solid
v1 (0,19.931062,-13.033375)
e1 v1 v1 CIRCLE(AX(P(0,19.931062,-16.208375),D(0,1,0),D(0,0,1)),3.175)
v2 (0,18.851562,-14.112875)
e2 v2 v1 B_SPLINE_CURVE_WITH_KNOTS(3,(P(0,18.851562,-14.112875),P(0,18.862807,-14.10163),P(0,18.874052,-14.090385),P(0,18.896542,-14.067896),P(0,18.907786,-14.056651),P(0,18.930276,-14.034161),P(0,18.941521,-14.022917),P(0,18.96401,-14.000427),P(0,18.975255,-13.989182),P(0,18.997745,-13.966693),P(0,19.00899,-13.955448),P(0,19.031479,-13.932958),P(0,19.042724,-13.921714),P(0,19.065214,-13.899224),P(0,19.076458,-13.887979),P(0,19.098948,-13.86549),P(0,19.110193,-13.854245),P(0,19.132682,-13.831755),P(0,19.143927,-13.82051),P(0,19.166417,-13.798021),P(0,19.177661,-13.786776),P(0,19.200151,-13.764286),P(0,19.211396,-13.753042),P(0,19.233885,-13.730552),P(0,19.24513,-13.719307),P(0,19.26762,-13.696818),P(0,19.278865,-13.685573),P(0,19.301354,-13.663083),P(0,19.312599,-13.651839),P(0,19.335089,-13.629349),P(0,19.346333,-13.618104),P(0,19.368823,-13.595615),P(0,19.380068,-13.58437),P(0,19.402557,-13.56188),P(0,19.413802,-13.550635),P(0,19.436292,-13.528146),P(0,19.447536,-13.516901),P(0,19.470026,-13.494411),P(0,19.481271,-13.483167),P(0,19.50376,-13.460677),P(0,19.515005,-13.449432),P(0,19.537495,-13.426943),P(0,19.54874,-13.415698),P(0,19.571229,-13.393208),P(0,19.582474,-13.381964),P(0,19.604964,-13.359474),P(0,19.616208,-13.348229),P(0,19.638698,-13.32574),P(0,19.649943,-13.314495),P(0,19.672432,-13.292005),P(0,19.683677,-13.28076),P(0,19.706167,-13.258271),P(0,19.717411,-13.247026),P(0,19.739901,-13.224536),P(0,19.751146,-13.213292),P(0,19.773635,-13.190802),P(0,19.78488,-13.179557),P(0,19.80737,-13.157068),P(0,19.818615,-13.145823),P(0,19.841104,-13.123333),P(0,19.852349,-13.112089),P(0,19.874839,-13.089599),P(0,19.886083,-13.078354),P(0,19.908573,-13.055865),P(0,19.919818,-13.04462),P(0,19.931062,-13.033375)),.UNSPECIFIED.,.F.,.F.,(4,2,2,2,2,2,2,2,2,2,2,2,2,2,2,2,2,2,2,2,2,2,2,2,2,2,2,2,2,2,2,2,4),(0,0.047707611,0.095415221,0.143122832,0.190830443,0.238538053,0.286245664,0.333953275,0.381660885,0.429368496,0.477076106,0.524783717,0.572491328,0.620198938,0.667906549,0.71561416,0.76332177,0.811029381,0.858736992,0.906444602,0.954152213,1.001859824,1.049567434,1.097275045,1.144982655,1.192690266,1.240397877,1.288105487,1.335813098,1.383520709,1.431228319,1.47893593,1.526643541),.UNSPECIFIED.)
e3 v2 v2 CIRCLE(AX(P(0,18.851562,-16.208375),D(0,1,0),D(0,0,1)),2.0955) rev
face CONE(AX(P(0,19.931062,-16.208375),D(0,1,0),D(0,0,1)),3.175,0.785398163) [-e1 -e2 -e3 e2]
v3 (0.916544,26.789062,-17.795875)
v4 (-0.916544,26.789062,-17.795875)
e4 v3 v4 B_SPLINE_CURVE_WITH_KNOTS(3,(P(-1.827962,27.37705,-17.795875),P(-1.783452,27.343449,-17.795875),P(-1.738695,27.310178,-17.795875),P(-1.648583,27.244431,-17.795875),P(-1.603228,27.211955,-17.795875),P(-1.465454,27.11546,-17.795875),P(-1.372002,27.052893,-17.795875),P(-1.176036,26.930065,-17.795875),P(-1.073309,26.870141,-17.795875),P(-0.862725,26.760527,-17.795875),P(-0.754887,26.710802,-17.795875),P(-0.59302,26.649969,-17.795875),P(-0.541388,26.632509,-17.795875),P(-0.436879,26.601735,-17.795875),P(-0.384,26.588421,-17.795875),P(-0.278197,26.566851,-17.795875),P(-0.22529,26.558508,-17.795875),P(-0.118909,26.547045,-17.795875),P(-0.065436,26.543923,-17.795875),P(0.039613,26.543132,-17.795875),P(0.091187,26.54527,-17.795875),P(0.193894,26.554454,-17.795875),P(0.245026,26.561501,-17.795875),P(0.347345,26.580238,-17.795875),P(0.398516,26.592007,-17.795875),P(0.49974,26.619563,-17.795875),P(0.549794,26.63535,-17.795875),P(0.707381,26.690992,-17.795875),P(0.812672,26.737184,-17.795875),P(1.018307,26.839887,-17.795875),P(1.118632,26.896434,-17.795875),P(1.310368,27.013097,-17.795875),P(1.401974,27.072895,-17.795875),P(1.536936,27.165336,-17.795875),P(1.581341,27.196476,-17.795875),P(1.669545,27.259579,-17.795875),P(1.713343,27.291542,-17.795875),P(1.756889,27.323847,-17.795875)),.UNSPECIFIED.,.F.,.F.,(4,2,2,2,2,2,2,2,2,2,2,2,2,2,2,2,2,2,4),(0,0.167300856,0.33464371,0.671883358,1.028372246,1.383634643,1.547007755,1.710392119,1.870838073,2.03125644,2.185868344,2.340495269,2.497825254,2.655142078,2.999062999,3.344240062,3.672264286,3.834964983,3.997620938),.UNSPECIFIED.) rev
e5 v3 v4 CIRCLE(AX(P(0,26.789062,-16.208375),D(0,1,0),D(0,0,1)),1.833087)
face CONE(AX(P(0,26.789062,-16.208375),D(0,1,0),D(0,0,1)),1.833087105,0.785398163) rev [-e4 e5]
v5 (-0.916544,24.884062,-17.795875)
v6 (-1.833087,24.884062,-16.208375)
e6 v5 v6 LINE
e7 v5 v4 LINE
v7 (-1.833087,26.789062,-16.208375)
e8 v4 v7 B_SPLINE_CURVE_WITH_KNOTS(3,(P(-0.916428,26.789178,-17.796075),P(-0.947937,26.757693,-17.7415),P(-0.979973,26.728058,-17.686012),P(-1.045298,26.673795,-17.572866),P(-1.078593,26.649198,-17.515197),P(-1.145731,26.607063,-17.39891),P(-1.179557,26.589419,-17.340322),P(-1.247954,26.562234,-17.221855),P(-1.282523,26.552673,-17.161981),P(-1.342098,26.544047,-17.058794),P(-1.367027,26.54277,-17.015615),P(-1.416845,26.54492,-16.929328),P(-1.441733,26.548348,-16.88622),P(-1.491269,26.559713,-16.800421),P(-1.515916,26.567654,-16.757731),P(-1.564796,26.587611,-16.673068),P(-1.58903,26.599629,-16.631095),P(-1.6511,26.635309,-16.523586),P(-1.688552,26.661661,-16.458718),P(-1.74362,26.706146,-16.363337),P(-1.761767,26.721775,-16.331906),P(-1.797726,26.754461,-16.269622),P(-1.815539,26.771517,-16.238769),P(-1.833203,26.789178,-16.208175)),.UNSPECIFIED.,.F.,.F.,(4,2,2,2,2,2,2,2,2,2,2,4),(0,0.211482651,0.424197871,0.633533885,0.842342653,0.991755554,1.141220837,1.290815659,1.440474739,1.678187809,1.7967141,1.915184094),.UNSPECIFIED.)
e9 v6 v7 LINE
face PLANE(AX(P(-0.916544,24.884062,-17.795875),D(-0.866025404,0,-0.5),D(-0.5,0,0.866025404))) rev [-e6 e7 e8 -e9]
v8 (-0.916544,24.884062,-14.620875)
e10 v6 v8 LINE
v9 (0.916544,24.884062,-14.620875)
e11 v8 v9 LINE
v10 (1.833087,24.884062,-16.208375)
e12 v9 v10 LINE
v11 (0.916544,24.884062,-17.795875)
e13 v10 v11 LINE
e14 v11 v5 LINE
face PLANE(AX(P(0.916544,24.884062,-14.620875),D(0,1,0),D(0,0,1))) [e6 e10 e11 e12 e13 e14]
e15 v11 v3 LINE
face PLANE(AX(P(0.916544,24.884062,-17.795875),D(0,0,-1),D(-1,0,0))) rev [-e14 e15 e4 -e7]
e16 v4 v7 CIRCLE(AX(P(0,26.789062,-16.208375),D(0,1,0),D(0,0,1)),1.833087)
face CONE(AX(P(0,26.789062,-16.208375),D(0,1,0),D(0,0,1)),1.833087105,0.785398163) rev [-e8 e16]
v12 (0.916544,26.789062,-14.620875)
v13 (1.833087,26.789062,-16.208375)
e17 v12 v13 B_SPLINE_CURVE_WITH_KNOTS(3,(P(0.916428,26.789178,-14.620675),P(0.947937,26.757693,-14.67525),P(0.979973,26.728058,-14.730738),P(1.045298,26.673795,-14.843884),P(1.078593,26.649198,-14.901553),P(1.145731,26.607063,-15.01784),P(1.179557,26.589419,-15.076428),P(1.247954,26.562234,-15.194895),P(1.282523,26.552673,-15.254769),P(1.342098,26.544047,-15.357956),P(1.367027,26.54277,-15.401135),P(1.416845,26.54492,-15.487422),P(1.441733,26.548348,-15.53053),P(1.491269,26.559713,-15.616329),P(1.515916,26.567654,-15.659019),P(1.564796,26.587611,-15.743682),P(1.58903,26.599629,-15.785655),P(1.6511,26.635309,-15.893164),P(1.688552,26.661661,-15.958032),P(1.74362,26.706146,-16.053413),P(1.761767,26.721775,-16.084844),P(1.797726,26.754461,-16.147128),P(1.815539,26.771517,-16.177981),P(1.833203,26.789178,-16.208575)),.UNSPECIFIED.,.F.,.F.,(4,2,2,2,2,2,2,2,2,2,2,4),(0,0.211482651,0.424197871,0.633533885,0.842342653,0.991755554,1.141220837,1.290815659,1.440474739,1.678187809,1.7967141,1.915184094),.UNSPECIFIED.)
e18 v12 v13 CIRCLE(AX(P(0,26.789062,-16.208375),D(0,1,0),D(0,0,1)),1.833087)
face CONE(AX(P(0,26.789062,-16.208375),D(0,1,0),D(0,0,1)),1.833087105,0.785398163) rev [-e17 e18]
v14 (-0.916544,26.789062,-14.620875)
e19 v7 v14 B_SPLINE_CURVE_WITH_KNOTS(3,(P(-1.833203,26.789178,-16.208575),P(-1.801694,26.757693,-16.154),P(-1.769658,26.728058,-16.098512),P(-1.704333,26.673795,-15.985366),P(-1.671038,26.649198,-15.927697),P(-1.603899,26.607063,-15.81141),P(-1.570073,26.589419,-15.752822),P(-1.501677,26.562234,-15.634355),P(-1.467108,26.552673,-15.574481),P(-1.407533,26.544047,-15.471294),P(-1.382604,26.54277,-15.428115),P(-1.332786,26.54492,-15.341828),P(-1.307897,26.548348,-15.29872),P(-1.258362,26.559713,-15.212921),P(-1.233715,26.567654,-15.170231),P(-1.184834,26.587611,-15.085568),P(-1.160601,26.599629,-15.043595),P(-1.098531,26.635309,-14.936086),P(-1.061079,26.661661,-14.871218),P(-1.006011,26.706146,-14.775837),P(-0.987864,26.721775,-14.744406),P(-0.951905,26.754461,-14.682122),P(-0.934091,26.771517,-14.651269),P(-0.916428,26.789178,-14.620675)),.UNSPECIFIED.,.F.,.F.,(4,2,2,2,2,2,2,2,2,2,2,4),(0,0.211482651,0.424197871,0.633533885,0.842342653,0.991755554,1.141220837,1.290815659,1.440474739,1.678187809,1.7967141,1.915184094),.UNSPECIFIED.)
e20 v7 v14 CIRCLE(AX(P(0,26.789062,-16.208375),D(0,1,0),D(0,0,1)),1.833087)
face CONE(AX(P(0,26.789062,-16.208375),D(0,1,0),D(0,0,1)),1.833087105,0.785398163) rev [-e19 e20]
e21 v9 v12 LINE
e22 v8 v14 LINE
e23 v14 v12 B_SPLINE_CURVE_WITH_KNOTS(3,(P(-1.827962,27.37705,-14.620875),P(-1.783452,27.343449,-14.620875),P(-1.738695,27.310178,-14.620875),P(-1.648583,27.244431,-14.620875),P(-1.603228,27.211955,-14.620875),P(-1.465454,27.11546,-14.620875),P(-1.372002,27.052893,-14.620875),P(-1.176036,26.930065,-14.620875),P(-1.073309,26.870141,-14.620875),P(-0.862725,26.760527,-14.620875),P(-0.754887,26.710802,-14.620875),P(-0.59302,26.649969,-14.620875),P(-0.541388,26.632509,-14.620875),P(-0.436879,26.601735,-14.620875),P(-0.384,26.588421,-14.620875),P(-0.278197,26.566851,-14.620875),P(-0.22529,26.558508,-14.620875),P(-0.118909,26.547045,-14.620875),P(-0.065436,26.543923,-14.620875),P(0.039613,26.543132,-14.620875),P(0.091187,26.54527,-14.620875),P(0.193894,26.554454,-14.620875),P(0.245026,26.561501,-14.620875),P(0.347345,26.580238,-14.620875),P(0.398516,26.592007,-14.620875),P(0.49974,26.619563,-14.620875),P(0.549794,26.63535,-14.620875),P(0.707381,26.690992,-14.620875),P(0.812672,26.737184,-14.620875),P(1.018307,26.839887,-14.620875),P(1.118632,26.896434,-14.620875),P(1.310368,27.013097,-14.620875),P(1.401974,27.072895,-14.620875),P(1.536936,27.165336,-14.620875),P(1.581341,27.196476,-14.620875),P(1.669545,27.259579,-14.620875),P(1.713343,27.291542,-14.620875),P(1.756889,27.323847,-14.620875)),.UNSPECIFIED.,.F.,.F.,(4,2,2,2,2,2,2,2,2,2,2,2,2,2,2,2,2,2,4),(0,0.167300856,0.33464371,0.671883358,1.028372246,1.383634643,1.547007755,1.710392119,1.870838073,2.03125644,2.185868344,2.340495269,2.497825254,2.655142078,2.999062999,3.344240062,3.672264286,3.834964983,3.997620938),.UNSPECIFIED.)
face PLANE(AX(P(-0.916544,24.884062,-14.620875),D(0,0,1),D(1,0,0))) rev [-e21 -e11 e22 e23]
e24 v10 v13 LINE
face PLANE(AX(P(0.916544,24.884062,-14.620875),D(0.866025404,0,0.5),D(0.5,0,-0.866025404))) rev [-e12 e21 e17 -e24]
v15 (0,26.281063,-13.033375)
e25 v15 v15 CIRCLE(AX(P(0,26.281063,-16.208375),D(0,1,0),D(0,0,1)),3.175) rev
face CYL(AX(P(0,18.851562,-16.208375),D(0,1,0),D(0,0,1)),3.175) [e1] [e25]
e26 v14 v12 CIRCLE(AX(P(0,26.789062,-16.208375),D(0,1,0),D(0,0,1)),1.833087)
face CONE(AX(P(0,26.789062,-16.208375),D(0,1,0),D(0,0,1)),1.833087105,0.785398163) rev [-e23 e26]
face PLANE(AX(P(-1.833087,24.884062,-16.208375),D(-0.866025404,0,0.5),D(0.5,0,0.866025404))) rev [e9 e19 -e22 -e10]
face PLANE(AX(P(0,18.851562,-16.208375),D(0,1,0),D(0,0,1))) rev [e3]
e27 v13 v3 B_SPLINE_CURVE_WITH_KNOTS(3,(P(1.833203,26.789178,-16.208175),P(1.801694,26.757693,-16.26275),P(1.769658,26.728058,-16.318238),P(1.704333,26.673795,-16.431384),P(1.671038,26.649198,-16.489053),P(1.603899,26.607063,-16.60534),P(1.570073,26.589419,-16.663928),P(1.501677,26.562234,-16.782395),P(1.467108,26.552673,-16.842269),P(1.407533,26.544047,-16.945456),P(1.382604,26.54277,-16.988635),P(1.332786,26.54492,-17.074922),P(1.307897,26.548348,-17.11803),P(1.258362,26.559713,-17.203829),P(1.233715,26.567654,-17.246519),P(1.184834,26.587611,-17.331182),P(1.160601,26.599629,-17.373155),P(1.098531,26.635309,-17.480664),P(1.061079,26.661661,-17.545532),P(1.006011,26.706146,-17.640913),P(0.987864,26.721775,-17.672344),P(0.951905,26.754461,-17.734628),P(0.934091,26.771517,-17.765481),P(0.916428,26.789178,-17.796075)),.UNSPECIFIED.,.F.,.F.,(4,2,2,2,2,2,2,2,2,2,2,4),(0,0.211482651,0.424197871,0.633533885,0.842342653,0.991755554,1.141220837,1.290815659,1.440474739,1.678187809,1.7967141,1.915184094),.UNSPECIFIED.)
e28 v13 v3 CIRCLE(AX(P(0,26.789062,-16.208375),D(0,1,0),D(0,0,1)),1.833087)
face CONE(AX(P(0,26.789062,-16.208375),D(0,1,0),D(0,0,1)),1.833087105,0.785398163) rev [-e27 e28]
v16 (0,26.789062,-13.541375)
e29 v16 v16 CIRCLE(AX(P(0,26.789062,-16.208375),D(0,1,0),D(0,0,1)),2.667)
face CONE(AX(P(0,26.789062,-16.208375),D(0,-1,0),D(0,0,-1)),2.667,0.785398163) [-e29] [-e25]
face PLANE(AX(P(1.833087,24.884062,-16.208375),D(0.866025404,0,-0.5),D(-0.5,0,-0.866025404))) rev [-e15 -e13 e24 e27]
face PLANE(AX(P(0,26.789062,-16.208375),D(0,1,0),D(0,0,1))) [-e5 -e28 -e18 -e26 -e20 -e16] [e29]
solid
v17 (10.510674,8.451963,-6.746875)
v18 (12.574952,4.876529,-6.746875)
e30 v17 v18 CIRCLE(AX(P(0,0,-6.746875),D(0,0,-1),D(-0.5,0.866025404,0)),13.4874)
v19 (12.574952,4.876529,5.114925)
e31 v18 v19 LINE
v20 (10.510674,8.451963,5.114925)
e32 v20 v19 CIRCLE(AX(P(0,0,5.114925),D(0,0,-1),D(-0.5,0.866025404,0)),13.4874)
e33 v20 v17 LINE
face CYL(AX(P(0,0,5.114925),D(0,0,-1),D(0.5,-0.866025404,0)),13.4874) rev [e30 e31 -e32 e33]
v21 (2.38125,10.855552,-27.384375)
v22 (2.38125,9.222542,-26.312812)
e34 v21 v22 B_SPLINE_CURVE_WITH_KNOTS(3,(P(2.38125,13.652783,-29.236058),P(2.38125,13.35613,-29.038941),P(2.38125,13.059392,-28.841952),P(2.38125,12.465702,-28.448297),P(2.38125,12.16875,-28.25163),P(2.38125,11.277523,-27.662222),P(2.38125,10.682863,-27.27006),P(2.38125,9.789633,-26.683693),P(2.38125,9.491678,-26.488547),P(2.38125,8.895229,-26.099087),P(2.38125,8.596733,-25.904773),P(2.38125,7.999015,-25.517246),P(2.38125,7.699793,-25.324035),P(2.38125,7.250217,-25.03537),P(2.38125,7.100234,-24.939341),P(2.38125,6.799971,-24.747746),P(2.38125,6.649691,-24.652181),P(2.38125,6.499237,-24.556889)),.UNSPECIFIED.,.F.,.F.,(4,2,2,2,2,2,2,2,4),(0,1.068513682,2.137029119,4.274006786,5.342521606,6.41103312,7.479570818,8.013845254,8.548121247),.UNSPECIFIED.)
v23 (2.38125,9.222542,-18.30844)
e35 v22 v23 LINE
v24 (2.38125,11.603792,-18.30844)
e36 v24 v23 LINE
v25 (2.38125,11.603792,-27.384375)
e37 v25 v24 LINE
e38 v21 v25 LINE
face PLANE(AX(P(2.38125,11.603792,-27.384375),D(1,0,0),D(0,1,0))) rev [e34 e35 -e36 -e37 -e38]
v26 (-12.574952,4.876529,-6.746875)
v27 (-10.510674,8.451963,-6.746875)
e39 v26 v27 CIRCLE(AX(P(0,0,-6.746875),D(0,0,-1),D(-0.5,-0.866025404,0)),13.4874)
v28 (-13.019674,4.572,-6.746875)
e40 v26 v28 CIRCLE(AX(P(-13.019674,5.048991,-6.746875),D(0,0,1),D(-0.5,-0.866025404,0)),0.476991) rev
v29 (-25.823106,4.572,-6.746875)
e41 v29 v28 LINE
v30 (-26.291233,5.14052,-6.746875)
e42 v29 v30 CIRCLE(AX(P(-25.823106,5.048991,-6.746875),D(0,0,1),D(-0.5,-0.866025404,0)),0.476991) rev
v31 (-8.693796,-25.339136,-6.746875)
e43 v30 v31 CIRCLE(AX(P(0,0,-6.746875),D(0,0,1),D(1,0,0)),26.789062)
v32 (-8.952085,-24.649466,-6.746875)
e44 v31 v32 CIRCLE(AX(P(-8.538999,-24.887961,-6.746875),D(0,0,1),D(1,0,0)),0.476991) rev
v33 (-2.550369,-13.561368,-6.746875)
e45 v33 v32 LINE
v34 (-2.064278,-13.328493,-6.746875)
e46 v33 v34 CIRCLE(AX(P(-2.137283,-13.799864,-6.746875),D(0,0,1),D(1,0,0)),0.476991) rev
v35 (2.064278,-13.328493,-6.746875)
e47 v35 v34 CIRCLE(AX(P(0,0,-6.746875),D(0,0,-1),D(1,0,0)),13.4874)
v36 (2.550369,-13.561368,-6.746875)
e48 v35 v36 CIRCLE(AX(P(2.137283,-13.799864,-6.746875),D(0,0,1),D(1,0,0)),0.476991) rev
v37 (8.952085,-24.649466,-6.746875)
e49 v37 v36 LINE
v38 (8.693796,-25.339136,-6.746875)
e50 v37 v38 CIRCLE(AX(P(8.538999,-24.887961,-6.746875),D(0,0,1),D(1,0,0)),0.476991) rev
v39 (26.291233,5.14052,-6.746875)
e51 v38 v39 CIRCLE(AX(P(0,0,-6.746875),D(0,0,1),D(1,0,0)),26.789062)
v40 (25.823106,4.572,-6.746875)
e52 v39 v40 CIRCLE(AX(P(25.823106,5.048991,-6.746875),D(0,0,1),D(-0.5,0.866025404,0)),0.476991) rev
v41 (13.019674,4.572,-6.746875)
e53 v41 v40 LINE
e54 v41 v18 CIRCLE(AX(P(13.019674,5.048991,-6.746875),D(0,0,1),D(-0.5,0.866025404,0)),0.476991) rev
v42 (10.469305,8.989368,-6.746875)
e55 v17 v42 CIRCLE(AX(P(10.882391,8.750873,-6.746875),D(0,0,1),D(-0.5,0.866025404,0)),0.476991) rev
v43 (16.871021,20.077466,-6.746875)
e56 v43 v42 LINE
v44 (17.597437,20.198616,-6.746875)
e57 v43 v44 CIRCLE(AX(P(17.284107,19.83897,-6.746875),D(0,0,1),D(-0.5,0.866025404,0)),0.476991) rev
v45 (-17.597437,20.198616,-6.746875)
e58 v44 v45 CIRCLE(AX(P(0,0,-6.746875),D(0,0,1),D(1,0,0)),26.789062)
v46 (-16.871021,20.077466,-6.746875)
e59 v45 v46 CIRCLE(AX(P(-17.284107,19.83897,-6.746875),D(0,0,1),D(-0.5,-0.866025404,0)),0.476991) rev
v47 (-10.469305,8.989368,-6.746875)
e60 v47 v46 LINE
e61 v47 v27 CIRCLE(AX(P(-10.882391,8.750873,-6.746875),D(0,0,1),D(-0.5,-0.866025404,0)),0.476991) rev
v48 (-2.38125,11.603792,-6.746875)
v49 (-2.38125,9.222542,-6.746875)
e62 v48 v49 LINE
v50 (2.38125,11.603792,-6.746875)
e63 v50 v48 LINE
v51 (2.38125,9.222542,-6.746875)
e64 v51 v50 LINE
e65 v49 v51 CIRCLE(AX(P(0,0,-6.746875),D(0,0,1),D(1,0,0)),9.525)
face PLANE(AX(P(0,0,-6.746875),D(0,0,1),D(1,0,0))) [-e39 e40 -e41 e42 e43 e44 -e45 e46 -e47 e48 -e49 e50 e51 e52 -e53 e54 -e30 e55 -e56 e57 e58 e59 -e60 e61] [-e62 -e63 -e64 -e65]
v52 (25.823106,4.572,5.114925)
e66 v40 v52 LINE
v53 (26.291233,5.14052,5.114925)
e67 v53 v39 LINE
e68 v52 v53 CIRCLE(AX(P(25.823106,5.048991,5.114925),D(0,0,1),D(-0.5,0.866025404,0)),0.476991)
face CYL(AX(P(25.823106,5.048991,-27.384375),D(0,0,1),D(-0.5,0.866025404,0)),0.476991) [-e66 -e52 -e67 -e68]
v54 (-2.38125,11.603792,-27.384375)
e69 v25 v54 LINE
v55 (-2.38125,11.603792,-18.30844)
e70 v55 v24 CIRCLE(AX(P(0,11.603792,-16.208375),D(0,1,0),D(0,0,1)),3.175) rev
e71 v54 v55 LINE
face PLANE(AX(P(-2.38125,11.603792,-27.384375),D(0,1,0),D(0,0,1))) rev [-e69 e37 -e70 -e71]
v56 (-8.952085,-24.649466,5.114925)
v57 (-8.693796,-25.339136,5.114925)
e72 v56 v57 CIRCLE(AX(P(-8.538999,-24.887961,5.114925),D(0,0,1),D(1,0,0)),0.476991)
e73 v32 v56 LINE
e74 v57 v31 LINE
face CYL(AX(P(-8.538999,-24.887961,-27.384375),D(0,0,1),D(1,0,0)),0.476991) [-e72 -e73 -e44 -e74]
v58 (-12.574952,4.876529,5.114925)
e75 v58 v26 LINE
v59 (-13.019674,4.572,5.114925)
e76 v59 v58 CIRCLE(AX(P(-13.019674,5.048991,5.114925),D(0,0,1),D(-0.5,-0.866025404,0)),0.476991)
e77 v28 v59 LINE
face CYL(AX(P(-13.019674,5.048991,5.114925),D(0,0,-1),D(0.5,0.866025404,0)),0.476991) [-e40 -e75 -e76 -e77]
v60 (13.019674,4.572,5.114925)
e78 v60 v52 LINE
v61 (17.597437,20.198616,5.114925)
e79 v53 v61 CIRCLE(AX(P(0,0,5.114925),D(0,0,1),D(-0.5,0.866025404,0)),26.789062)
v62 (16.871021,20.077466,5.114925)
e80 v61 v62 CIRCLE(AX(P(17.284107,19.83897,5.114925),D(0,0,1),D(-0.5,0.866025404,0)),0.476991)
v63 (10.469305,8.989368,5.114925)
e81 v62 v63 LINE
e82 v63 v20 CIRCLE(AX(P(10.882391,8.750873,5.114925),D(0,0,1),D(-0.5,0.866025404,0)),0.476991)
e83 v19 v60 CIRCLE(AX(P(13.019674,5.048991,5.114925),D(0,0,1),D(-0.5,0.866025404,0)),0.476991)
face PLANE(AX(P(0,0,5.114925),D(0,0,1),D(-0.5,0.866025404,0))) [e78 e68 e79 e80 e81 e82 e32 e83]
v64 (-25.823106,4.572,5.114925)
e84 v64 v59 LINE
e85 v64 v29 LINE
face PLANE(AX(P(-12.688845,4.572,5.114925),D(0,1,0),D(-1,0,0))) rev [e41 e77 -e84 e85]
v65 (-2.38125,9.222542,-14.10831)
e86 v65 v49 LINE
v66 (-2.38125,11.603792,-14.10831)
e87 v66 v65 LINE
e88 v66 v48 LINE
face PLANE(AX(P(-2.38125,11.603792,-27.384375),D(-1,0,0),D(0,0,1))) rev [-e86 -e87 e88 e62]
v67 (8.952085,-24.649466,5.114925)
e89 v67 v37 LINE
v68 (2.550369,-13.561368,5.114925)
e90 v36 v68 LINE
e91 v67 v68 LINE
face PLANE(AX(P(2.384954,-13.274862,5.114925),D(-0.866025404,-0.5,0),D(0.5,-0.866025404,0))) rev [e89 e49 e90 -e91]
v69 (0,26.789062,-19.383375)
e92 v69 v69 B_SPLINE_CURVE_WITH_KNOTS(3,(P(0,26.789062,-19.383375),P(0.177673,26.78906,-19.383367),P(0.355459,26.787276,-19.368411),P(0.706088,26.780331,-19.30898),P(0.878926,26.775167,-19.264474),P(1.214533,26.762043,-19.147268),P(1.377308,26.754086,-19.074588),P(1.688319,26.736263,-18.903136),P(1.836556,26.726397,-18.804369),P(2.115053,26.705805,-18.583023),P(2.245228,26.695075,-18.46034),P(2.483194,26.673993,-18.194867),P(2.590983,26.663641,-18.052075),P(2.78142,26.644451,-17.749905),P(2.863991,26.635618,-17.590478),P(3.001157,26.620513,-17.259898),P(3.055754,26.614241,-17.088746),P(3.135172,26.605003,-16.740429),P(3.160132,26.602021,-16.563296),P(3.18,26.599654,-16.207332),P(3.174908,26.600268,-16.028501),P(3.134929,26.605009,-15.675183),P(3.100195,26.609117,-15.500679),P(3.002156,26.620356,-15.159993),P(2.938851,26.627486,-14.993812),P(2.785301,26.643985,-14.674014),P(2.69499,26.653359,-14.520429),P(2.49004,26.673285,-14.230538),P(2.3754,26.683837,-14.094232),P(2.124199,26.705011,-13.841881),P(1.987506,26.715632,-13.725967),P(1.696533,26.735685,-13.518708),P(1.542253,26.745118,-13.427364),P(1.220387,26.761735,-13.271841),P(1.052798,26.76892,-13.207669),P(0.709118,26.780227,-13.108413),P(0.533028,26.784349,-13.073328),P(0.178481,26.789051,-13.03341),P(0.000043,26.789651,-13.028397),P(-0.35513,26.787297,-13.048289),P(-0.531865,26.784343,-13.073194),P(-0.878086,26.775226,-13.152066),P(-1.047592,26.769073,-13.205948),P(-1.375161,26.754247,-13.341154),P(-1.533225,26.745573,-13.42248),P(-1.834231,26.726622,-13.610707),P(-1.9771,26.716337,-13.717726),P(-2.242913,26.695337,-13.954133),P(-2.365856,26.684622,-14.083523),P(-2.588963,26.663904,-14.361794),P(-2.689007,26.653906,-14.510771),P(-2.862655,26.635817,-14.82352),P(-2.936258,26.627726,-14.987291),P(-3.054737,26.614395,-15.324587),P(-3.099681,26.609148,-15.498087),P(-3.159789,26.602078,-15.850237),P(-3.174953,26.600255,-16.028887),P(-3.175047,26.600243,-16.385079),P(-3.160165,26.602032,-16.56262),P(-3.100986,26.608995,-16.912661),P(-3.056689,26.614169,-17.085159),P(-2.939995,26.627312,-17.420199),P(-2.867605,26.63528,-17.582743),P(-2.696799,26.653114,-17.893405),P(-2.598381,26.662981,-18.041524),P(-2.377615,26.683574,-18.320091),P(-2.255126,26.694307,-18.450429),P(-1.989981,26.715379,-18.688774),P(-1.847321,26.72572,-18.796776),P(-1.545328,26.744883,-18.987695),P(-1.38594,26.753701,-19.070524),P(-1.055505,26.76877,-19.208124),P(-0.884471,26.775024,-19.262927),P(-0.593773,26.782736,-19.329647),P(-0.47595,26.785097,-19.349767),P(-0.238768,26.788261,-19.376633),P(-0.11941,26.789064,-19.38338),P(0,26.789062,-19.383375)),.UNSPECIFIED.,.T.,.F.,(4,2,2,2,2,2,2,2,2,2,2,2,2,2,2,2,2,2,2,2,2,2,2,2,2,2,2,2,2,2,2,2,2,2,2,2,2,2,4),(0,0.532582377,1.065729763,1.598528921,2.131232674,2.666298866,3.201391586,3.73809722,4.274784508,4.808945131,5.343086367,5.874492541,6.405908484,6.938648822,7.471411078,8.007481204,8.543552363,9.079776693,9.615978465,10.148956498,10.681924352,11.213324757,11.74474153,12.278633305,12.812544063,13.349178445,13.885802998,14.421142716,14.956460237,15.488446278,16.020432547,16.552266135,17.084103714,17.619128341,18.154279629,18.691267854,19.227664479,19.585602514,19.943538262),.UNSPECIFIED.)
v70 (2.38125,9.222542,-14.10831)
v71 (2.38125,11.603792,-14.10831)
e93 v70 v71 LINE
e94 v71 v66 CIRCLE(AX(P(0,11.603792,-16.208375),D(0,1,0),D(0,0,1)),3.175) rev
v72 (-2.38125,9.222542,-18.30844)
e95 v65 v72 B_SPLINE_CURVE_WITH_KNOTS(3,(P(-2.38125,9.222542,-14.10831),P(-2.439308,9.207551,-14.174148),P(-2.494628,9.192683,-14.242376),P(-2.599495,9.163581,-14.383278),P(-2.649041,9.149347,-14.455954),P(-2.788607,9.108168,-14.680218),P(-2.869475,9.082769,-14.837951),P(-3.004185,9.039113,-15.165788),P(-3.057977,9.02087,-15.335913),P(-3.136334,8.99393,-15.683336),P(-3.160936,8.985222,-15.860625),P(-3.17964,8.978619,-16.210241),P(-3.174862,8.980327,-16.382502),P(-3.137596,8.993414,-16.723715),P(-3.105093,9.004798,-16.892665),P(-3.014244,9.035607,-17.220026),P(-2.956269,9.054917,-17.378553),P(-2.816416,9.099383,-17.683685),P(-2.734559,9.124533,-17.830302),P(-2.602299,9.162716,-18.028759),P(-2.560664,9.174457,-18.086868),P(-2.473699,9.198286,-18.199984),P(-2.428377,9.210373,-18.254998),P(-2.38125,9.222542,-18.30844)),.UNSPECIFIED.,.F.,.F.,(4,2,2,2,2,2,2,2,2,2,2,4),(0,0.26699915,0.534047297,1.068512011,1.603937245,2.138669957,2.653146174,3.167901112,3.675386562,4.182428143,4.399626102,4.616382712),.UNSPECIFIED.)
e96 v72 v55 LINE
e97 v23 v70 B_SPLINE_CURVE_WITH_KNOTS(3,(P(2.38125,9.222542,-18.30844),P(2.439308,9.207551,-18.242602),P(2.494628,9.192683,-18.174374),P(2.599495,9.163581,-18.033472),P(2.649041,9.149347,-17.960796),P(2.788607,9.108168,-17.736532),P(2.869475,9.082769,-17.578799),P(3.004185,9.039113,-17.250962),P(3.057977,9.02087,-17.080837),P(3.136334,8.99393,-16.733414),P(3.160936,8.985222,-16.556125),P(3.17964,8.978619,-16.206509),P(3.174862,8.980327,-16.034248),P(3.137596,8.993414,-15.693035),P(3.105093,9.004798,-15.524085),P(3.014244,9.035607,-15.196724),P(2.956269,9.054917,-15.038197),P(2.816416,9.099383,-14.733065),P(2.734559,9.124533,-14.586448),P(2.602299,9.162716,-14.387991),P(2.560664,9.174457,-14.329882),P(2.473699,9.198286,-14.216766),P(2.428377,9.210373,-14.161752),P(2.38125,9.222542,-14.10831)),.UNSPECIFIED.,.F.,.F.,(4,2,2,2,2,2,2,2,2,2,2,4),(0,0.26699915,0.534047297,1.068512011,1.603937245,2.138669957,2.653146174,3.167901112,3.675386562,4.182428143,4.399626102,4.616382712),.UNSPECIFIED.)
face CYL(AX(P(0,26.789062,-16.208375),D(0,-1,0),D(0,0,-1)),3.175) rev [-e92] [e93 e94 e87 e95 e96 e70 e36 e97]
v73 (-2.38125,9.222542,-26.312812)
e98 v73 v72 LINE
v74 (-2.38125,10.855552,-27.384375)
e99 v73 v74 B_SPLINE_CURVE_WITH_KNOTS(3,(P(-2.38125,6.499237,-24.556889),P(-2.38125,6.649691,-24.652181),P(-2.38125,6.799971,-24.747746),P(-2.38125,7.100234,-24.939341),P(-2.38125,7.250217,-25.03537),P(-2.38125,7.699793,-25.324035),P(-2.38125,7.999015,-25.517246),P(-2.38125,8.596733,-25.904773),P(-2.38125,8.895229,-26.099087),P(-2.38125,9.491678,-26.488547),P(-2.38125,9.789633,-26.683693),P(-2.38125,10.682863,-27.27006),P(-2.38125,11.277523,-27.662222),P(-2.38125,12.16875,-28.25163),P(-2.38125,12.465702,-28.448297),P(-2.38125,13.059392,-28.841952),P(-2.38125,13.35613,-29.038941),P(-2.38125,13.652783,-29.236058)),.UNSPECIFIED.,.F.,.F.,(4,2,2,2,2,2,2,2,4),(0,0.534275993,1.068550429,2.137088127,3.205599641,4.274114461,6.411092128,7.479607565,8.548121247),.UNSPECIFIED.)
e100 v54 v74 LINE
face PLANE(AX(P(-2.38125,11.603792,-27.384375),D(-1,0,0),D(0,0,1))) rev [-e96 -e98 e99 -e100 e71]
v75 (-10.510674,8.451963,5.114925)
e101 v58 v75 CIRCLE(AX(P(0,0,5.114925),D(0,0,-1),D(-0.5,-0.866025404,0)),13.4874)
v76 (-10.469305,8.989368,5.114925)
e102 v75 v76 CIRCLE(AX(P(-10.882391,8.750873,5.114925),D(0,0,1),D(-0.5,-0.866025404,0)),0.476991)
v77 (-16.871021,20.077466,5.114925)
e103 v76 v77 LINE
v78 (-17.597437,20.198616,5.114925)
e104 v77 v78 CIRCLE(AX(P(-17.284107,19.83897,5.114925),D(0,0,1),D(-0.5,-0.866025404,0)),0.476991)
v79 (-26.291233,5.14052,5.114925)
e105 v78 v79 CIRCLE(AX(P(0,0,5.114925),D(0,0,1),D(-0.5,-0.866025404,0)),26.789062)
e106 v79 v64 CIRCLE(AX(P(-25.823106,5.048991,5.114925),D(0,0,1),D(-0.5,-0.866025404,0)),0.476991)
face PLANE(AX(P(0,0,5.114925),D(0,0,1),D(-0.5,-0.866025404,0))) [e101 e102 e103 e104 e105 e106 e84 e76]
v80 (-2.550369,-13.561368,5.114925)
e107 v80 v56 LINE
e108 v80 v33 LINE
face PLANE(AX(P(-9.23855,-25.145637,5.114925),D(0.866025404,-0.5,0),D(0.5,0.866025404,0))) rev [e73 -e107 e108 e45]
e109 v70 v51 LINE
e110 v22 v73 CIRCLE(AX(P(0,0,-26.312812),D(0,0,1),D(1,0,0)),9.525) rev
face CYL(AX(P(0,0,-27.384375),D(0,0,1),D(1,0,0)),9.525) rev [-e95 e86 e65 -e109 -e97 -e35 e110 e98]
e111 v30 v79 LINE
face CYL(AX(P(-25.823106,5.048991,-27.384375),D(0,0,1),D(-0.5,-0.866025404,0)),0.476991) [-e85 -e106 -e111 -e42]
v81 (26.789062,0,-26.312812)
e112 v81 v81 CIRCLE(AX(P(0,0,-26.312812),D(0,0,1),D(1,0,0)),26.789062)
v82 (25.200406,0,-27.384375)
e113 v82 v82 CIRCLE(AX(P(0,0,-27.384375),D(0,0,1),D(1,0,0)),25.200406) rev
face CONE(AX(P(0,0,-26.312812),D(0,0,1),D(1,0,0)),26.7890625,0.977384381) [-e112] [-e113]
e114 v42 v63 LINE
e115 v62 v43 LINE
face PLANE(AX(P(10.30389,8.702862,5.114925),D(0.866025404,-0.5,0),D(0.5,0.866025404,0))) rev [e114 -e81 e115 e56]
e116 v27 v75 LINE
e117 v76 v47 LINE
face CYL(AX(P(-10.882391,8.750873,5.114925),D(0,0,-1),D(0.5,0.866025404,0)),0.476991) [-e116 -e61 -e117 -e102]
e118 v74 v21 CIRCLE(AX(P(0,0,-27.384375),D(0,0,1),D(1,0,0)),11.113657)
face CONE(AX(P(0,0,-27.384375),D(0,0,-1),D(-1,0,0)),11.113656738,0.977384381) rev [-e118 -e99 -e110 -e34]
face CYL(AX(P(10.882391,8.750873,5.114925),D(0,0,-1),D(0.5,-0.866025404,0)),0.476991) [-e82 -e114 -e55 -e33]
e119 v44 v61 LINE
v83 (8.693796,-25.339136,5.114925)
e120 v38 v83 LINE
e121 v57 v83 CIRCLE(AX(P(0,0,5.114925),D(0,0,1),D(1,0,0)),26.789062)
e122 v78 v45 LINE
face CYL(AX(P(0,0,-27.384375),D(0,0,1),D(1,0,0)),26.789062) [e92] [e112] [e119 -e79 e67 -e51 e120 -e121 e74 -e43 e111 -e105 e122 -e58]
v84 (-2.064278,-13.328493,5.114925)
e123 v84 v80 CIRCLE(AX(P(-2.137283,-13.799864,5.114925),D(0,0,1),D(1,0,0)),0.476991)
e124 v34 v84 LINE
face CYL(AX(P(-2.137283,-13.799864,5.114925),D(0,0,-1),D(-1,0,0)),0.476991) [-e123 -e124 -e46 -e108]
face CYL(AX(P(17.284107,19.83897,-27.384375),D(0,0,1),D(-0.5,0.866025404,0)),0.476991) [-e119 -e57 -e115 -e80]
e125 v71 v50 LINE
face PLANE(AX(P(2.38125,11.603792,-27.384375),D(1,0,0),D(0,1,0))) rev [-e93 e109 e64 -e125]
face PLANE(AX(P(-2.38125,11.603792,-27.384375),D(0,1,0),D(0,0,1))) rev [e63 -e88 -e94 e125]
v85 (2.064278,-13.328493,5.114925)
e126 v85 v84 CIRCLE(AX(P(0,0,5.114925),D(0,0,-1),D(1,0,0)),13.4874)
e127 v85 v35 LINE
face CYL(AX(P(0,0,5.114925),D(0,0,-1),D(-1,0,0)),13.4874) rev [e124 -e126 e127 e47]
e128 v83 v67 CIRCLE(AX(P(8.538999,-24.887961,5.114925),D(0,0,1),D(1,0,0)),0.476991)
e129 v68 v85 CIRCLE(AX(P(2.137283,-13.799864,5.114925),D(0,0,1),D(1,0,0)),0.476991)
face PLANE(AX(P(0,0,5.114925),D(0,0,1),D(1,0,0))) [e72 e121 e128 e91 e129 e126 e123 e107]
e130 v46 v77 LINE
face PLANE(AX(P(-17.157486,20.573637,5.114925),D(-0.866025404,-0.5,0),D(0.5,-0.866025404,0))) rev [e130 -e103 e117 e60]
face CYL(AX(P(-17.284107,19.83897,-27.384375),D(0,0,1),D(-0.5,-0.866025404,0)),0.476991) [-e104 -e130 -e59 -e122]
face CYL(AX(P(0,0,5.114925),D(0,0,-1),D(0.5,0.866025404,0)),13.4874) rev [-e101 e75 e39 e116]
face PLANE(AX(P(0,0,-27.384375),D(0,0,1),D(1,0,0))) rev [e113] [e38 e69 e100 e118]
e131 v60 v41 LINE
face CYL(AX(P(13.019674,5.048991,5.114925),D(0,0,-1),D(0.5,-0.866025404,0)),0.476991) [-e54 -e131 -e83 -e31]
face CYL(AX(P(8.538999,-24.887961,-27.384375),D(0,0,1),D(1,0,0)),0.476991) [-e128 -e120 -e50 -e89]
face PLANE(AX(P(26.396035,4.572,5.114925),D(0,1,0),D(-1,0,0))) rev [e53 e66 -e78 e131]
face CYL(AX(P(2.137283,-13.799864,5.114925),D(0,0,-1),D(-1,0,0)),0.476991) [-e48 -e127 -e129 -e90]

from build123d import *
from OCP.BRepFilletAPI import BRepFilletAPI_MakeChamfer

# Parameters (mm, degrees)
BOSS_EXTRUDE1_START      = -6.746875
SKETCH1_R                = 26.7890625
BOSS_EXTRUDE1_DEPTH      = 20.6375
BOSS_EXTRUDE2_DEPTH      = 11.8618
FILLET1_R                = 0.476990821
CIRPATTERN1_COUNT        = 3
FILLET1_OF_CIRPATTERN1_R = 0.476990821
CUT_EXTRUDE5_DEPTH       = 47.746248335
CUT_EXTRUDE5_DEPTH_BACK  = 47.746248335
SKETCH15_R               = 9.525
CHAMFER1_SIZE            = 1.0715625
CHAMFER1_SIZE2           = 1.588656738
CUT_EXTRUDE1_DEPTH       = 47.746248335
CUT_EXTRUDE1_DEPTH_BACK  = 47.746248335
SKETCH5_R                = 3.175
CUT_EXTRUDE2_DEPTH       = 47.746248335
SKETCH6_R                = 3.175
BOSS_EXTRUDE3_DEPTH      = 7.9375
CUT_EXTRUDE3_DEPTH       = 1.905
CHAMFER3_SIZE            = 0.508
CHAMFER4_SIZE            = 1.0795


with BuildPart() as part:
    # Sketch1 → Boss-Extrude1 (new body)
    with BuildSketch(Plane.XY.offset(BOSS_EXTRUDE1_START)):
        Circle(SKETCH1_R)
    extrude(amount=-BOSS_EXTRUDE1_DEPTH)

    # Sketch2 → Boss-Extrude2 (add)
    with BuildSketch(Plane.XY.offset(-6.746875)):
        with BuildLine():
            Line((-9.238549561, -25.145637229), (-2.384954104, -13.274861682))
            ThreePointArc((-2.384954104, -13.274861682), (0, -13.4874), (2.384954104, -13.274861682))
            Line((2.384954104, -13.274861682), (9.238549561, -25.145637229))
            ThreePointArc((9.238549561, -25.145637229), (0, -26.7890625), (-9.238549561, -25.145637229))
        make_face()
    boss_extrude2 = extrude(amount=BOSS_EXTRUDE2_DEPTH)

    # Fillet1
    # the kernel refuses this fillet: 0.476990821 mm, written as the material it takes off along each edge
    with BuildSketch(Plane(origin=(-9.238549561, -25.145637229, -6.746875), x_dir=(0.9423194959651416, -0.33471475546202245, 0), z_dir=(0, 0, 1))) as fillet1_piece_1:
        with BuildLine():
            CenterArc((0.572952448, 0.476963054), FILLET1_R, 169.55519331, 101.063030663)
            Line((0.103865366, 0.563435893), (0, 0))
            ThreePointArc((0, 0), (0.28904955, -0.001559444), (0.5780991, 0))
        make_face()
    extrude(amount=13.307047751, mode=Mode.SUBTRACT)
    with BuildSketch(Plane(origin=(9.238549561, -25.145637229, -6.746875), x_dir=(-0.9423194959651411, -0.3347147554620237, 0), z_dir=(0, 0, 1))) as fillet1_piece_2:
        with BuildLine():
            CenterArc((0.572952448, -0.476963054), FILLET1_R, 89.381776027, 101.063030663)
            Line((0.103865366, -0.563435893), (0, 0))
            ThreePointArc((0, 0), (0.28904955, 0.001559444), (0.5780991, 0))
        make_face()
    extrude(amount=13.307047751, mode=Mode.SUBTRACT)
    with BuildSketch(Plane(origin=(2.384954104, -13.274861682, -6.746875), x_dir=(0.49999999999999706, -0.8660254037844404, 0), z_dir=(0, 0, 1))) as fillet1_piece_3:
        with BuildLine():
            CenterArc((0.330829178, -0.476990821), FILLET1_R, 90, 68.803855098)
            ThreePointArc((-0.113892323, -0.304529143), (-0.056028498, -0.152607773), (0, 0))
            Line((0, 0), (0.330829178, 0))
        make_face()
    extrude(amount=12.688872944, mode=Mode.SUBTRACT)
    with BuildSketch(Plane(origin=(-2.384954104, -13.274861682, -6.746875), x_dir=(0.9863015455813384, -0.16495229972286882, 0), z_dir=(0, 0, 1))) as fillet1_piece_4:
        with BuildLine():
            CenterArc((0.330879129, -0.476956172), FILLET1_R, 90.690608377, 68.803855098)
            Line((-0.115888763, -0.309867293), (0, 0))
            ThreePointArc((0, 0), (0.162564956, -0.000979741), (0.325129912, 0))
        make_face()
    extrude(amount=12.688872944, mode=Mode.SUBTRACT)

    # CirPattern1: Boss-Extrude2 ×3 about axis
    cirpattern1_axis = Axis((0, 0, 0), (0, 0, 1))
    for i in range(1, CIRPATTERN1_COUNT):
        add(boss_extrude2.rotate(cirpattern1_axis, i * 360 / CIRPATTERN1_COUNT))

    # Fillet1 of CirPattern1
    # the kernel refuses this fillet: 0.476990821 mm, written as the material it takes off along each edge
    with BuildSketch(Plane(origin=(26.396035415, 4.572, -6.746875), x_dir=(-0.18128826673094764, 0.9834299997181745, 0), z_dir=(0, 0, 1)), Plane(origin=(-17.157485854, 20.573637229, -6.746875), x_dir=(-0.761031229234182, -0.6487152442561451, 0), z_dir=(0, 0, 1))) as fillet1_of_cirpattern1_piece_1:
        with BuildLine():
            CenterArc((0.572952448, 0.476963054), FILLET1_OF_CIRPATTERN1_R, 169.55519331, 101.063030663)
            Line((0.103865366, 0.563435893), (0, 0))
            ThreePointArc((0, 0), (0.28904955, -0.001559444), (0.5780991, 0))
        make_face()
    extrude(amount=13.307047751, mode=Mode.SUBTRACT)
    with BuildSketch(Plane(origin=(17.157485854, 20.573637229, -6.746875), x_dir=(0.7610312292341833, -0.6487152442561435, 0), z_dir=(0, 0, 1)), Plane(origin=(-26.396035415, 4.572, -6.746875), x_dir=(0.181288266730962, 0.9834299997181718, 0), z_dir=(0, 0, 1))) as fillet1_of_cirpattern1_piece_2:
        with BuildLine():
            CenterArc((0.572952448, -0.476963054), FILLET1_OF_CIRPATTERN1_R, 89.381776027, 101.063030663)
            Line((0.103865366, -0.563435893), (0, 0))
            ThreePointArc((0, 0), (0.28904955, 0.001559444), (0.5780991, 0))
        make_face()
    extrude(amount=13.307047751, mode=Mode.SUBTRACT)
    with BuildSketch(Plane(origin=(10.303890396, 8.702861682, -6.746875), x_dir=(0.5000000000000006, 0.8660254037844383, 0), z_dir=(0, 0, 1)), Plane(origin=(-12.688844501, 4.572, -6.746875), x_dir=(-1, 0, 0), z_dir=(0, 0, 1))) as fillet1_of_cirpattern1_piece_3:
        with BuildLine():
            CenterArc((0.330829178, -0.476990821), FILLET1_OF_CIRPATTERN1_R, 90, 68.803855098)
            ThreePointArc((-0.113892323, -0.304529143), (-0.056028498, -0.152607773), (0, 0))
            Line((0, 0), (0.330829178, 0))
        make_face()
    extrude(amount=12.688872944, mode=Mode.SUBTRACT)
    with BuildSketch(Plane(origin=(12.688844501, 4.572, -6.746875), x_dir=(-0.3502978908180006, 0.9366383441267288, 0), z_dir=(0, 0, 1)), Plane(origin=(-10.303890396, 8.702861682, -6.746875), x_dir=(-0.6360036547633316, -0.7716860444038657, 0), z_dir=(0, 0, 1))) as fillet1_of_cirpattern1_piece_4:
        with BuildLine():
            CenterArc((0.330879129, -0.476956172), FILLET1_OF_CIRPATTERN1_R, 90.690608377, 68.803855098)
            Line((-0.115888763, -0.309867293), (0, 0))
            ThreePointArc((0, 0), (0.162564956, -0.000979741), (0.325129912, 0))
        make_face()
    extrude(amount=12.688872944, mode=Mode.SUBTRACT)

    # Sketch15 → Cut-Extrude5 (cut, two sides: drawn at the far end of the back side and taken through both)
    with BuildSketch(Plane.XY.offset(-CUT_EXTRUDE5_DEPTH_BACK)):
        Circle(SKETCH15_R)
    extrude(amount=CUT_EXTRUDE5_DEPTH + CUT_EXTRUDE5_DEPTH_BACK, mode=Mode.SUBTRACT)

    # Chamfer1: one chamfer whose edges measure the first distance from different faces: ONE call of the kernel's chamfer builder (chamfer() names one face for all edges)
    chamfer1_edges_1 = [part.edges().sort_by_distance(p)[0] for p in [
        (-26.7890625, 0, -27.384375),
    ]]
    chamfer1_side_1 = [part.faces().sort_by_distance(p)[0] for p in [
        (-26.7890625, 0, -17.065625),
    ]]
    chamfer1_edges_2 = [part.edges().sort_by_distance(p)[0] for p in [
        (-9.525, 0, -27.384375),
    ]]
    chamfer1_side_2 = [part.faces().sort_by_distance(p)[0] for p in [
        (-9.525, 0, -17.065625),
    ]]
    chamfer1 = BRepFilletAPI_MakeChamfer(part.part.solid().wrapped)
    for e in chamfer1_edges_1:
        chamfer1.Add(CHAMFER1_SIZE, CHAMFER1_SIZE2, e.wrapped, chamfer1_side_1[0].wrapped)  # the first distance lies on this face
    for e in chamfer1_edges_2:
        chamfer1.Add(CHAMFER1_SIZE, CHAMFER1_SIZE2, e.wrapped, chamfer1_side_2[0].wrapped)  # the first distance lies on this face
    add(Compound.cast(chamfer1.Shape()), mode=Mode.REPLACE)

    # Sketch4 → Cut-Extrude1 (cut, two sides: drawn at the far end of the back side and taken through both)
    with BuildSketch(Plane.XY.offset(-CUT_EXTRUDE1_DEPTH_BACK)):
        with BuildLine():
            Line((-2.38125, 11.603791593), (2.38125, 11.603791593))
            Line((2.38125, 11.603791593), (2.38125, 9.222541593))
            ThreePointArc((2.38125, 9.222541593), (0, 9.525), (-2.38125, 9.222541593))
            Line((-2.38125, 9.222541593), (-2.38125, 11.603791593))
        make_face()
    extrude(amount=CUT_EXTRUDE1_DEPTH + CUT_EXTRUDE1_DEPTH_BACK, mode=Mode.SUBTRACT)

    # Sketch5 → Cut-Extrude2 (cut, through all)
    with BuildSketch(Plane(origin=(0, 0, 0), x_dir=(1, 0, 0), z_dir=(0, 1, 0))):
        with Locations(Location((0, 16.208375, 0), (0, 0, 90))):
            Circle(SKETCH5_R)
    extrude(amount=CUT_EXTRUDE2_DEPTH, mode=Mode.SUBTRACT)


with BuildPart() as body_2:
    # Sketch6 → Boss-Extrude3 (new body)
    with BuildSketch(Plane(origin=(0, 26.7890625, 0), x_dir=(-1, 0, 0), z_dir=(0, 1, 0))):
        with Locations(Location((0, -16.208375, 0), (0, 0, 90))):
            Circle(SKETCH6_R)
    extrude(amount=-BOSS_EXTRUDE3_DEPTH)

    # Sketch8 → Cut-Extrude3 (cut)
    with BuildSketch(Plane(origin=(0, 26.7890625, 0), x_dir=(1, 0, 0), z_dir=(0, 1, 0))):
        Polygon((0.916543552, 14.620875), (1.833087105, 16.208375), (0.916543552, 17.795875), (-0.916543552, 17.795875), (-1.833087105, 16.208375), (-0.916543552, 14.620875), align=None)
    extrude(amount=-CUT_EXTRUDE3_DEPTH, mode=Mode.SUBTRACT)

    # Cut-Extrude4 cone 1 section (through the dimple's axis) → Cut-Extrude4 (revolve, cut)
    with BuildSketch(Plane(origin=(0, 26.7890625, -16.208375), x_dir=(0, 0, 1), z_dir=(1, 0, 0))):
        Polygon((0, 0), (1.833087105, 0), (0, 1.833087105), align=None)
    revolve(axis=Axis((0, 26.7890625, -16.208375), (0, -1, 0)), mode=Mode.SUBTRACT)

    # Chamfer3
    chamfer3_edges = [body_2.edges().sort_by_distance(p)[0] for p in [
        (0, 26.7890625, -19.383375),
    ]]
    chamfer(chamfer3_edges, length=CHAMFER3_SIZE)

    # Chamfer4
    chamfer4_edges = [body_2.edges().sort_by_distance(p)[0] for p in [
        (0, 18.8515625, -19.383375),
    ]]
    chamfer(chamfer4_edges, length=CHAMFER4_SIZE)


solid = Compound([part.part, body_2.part])
